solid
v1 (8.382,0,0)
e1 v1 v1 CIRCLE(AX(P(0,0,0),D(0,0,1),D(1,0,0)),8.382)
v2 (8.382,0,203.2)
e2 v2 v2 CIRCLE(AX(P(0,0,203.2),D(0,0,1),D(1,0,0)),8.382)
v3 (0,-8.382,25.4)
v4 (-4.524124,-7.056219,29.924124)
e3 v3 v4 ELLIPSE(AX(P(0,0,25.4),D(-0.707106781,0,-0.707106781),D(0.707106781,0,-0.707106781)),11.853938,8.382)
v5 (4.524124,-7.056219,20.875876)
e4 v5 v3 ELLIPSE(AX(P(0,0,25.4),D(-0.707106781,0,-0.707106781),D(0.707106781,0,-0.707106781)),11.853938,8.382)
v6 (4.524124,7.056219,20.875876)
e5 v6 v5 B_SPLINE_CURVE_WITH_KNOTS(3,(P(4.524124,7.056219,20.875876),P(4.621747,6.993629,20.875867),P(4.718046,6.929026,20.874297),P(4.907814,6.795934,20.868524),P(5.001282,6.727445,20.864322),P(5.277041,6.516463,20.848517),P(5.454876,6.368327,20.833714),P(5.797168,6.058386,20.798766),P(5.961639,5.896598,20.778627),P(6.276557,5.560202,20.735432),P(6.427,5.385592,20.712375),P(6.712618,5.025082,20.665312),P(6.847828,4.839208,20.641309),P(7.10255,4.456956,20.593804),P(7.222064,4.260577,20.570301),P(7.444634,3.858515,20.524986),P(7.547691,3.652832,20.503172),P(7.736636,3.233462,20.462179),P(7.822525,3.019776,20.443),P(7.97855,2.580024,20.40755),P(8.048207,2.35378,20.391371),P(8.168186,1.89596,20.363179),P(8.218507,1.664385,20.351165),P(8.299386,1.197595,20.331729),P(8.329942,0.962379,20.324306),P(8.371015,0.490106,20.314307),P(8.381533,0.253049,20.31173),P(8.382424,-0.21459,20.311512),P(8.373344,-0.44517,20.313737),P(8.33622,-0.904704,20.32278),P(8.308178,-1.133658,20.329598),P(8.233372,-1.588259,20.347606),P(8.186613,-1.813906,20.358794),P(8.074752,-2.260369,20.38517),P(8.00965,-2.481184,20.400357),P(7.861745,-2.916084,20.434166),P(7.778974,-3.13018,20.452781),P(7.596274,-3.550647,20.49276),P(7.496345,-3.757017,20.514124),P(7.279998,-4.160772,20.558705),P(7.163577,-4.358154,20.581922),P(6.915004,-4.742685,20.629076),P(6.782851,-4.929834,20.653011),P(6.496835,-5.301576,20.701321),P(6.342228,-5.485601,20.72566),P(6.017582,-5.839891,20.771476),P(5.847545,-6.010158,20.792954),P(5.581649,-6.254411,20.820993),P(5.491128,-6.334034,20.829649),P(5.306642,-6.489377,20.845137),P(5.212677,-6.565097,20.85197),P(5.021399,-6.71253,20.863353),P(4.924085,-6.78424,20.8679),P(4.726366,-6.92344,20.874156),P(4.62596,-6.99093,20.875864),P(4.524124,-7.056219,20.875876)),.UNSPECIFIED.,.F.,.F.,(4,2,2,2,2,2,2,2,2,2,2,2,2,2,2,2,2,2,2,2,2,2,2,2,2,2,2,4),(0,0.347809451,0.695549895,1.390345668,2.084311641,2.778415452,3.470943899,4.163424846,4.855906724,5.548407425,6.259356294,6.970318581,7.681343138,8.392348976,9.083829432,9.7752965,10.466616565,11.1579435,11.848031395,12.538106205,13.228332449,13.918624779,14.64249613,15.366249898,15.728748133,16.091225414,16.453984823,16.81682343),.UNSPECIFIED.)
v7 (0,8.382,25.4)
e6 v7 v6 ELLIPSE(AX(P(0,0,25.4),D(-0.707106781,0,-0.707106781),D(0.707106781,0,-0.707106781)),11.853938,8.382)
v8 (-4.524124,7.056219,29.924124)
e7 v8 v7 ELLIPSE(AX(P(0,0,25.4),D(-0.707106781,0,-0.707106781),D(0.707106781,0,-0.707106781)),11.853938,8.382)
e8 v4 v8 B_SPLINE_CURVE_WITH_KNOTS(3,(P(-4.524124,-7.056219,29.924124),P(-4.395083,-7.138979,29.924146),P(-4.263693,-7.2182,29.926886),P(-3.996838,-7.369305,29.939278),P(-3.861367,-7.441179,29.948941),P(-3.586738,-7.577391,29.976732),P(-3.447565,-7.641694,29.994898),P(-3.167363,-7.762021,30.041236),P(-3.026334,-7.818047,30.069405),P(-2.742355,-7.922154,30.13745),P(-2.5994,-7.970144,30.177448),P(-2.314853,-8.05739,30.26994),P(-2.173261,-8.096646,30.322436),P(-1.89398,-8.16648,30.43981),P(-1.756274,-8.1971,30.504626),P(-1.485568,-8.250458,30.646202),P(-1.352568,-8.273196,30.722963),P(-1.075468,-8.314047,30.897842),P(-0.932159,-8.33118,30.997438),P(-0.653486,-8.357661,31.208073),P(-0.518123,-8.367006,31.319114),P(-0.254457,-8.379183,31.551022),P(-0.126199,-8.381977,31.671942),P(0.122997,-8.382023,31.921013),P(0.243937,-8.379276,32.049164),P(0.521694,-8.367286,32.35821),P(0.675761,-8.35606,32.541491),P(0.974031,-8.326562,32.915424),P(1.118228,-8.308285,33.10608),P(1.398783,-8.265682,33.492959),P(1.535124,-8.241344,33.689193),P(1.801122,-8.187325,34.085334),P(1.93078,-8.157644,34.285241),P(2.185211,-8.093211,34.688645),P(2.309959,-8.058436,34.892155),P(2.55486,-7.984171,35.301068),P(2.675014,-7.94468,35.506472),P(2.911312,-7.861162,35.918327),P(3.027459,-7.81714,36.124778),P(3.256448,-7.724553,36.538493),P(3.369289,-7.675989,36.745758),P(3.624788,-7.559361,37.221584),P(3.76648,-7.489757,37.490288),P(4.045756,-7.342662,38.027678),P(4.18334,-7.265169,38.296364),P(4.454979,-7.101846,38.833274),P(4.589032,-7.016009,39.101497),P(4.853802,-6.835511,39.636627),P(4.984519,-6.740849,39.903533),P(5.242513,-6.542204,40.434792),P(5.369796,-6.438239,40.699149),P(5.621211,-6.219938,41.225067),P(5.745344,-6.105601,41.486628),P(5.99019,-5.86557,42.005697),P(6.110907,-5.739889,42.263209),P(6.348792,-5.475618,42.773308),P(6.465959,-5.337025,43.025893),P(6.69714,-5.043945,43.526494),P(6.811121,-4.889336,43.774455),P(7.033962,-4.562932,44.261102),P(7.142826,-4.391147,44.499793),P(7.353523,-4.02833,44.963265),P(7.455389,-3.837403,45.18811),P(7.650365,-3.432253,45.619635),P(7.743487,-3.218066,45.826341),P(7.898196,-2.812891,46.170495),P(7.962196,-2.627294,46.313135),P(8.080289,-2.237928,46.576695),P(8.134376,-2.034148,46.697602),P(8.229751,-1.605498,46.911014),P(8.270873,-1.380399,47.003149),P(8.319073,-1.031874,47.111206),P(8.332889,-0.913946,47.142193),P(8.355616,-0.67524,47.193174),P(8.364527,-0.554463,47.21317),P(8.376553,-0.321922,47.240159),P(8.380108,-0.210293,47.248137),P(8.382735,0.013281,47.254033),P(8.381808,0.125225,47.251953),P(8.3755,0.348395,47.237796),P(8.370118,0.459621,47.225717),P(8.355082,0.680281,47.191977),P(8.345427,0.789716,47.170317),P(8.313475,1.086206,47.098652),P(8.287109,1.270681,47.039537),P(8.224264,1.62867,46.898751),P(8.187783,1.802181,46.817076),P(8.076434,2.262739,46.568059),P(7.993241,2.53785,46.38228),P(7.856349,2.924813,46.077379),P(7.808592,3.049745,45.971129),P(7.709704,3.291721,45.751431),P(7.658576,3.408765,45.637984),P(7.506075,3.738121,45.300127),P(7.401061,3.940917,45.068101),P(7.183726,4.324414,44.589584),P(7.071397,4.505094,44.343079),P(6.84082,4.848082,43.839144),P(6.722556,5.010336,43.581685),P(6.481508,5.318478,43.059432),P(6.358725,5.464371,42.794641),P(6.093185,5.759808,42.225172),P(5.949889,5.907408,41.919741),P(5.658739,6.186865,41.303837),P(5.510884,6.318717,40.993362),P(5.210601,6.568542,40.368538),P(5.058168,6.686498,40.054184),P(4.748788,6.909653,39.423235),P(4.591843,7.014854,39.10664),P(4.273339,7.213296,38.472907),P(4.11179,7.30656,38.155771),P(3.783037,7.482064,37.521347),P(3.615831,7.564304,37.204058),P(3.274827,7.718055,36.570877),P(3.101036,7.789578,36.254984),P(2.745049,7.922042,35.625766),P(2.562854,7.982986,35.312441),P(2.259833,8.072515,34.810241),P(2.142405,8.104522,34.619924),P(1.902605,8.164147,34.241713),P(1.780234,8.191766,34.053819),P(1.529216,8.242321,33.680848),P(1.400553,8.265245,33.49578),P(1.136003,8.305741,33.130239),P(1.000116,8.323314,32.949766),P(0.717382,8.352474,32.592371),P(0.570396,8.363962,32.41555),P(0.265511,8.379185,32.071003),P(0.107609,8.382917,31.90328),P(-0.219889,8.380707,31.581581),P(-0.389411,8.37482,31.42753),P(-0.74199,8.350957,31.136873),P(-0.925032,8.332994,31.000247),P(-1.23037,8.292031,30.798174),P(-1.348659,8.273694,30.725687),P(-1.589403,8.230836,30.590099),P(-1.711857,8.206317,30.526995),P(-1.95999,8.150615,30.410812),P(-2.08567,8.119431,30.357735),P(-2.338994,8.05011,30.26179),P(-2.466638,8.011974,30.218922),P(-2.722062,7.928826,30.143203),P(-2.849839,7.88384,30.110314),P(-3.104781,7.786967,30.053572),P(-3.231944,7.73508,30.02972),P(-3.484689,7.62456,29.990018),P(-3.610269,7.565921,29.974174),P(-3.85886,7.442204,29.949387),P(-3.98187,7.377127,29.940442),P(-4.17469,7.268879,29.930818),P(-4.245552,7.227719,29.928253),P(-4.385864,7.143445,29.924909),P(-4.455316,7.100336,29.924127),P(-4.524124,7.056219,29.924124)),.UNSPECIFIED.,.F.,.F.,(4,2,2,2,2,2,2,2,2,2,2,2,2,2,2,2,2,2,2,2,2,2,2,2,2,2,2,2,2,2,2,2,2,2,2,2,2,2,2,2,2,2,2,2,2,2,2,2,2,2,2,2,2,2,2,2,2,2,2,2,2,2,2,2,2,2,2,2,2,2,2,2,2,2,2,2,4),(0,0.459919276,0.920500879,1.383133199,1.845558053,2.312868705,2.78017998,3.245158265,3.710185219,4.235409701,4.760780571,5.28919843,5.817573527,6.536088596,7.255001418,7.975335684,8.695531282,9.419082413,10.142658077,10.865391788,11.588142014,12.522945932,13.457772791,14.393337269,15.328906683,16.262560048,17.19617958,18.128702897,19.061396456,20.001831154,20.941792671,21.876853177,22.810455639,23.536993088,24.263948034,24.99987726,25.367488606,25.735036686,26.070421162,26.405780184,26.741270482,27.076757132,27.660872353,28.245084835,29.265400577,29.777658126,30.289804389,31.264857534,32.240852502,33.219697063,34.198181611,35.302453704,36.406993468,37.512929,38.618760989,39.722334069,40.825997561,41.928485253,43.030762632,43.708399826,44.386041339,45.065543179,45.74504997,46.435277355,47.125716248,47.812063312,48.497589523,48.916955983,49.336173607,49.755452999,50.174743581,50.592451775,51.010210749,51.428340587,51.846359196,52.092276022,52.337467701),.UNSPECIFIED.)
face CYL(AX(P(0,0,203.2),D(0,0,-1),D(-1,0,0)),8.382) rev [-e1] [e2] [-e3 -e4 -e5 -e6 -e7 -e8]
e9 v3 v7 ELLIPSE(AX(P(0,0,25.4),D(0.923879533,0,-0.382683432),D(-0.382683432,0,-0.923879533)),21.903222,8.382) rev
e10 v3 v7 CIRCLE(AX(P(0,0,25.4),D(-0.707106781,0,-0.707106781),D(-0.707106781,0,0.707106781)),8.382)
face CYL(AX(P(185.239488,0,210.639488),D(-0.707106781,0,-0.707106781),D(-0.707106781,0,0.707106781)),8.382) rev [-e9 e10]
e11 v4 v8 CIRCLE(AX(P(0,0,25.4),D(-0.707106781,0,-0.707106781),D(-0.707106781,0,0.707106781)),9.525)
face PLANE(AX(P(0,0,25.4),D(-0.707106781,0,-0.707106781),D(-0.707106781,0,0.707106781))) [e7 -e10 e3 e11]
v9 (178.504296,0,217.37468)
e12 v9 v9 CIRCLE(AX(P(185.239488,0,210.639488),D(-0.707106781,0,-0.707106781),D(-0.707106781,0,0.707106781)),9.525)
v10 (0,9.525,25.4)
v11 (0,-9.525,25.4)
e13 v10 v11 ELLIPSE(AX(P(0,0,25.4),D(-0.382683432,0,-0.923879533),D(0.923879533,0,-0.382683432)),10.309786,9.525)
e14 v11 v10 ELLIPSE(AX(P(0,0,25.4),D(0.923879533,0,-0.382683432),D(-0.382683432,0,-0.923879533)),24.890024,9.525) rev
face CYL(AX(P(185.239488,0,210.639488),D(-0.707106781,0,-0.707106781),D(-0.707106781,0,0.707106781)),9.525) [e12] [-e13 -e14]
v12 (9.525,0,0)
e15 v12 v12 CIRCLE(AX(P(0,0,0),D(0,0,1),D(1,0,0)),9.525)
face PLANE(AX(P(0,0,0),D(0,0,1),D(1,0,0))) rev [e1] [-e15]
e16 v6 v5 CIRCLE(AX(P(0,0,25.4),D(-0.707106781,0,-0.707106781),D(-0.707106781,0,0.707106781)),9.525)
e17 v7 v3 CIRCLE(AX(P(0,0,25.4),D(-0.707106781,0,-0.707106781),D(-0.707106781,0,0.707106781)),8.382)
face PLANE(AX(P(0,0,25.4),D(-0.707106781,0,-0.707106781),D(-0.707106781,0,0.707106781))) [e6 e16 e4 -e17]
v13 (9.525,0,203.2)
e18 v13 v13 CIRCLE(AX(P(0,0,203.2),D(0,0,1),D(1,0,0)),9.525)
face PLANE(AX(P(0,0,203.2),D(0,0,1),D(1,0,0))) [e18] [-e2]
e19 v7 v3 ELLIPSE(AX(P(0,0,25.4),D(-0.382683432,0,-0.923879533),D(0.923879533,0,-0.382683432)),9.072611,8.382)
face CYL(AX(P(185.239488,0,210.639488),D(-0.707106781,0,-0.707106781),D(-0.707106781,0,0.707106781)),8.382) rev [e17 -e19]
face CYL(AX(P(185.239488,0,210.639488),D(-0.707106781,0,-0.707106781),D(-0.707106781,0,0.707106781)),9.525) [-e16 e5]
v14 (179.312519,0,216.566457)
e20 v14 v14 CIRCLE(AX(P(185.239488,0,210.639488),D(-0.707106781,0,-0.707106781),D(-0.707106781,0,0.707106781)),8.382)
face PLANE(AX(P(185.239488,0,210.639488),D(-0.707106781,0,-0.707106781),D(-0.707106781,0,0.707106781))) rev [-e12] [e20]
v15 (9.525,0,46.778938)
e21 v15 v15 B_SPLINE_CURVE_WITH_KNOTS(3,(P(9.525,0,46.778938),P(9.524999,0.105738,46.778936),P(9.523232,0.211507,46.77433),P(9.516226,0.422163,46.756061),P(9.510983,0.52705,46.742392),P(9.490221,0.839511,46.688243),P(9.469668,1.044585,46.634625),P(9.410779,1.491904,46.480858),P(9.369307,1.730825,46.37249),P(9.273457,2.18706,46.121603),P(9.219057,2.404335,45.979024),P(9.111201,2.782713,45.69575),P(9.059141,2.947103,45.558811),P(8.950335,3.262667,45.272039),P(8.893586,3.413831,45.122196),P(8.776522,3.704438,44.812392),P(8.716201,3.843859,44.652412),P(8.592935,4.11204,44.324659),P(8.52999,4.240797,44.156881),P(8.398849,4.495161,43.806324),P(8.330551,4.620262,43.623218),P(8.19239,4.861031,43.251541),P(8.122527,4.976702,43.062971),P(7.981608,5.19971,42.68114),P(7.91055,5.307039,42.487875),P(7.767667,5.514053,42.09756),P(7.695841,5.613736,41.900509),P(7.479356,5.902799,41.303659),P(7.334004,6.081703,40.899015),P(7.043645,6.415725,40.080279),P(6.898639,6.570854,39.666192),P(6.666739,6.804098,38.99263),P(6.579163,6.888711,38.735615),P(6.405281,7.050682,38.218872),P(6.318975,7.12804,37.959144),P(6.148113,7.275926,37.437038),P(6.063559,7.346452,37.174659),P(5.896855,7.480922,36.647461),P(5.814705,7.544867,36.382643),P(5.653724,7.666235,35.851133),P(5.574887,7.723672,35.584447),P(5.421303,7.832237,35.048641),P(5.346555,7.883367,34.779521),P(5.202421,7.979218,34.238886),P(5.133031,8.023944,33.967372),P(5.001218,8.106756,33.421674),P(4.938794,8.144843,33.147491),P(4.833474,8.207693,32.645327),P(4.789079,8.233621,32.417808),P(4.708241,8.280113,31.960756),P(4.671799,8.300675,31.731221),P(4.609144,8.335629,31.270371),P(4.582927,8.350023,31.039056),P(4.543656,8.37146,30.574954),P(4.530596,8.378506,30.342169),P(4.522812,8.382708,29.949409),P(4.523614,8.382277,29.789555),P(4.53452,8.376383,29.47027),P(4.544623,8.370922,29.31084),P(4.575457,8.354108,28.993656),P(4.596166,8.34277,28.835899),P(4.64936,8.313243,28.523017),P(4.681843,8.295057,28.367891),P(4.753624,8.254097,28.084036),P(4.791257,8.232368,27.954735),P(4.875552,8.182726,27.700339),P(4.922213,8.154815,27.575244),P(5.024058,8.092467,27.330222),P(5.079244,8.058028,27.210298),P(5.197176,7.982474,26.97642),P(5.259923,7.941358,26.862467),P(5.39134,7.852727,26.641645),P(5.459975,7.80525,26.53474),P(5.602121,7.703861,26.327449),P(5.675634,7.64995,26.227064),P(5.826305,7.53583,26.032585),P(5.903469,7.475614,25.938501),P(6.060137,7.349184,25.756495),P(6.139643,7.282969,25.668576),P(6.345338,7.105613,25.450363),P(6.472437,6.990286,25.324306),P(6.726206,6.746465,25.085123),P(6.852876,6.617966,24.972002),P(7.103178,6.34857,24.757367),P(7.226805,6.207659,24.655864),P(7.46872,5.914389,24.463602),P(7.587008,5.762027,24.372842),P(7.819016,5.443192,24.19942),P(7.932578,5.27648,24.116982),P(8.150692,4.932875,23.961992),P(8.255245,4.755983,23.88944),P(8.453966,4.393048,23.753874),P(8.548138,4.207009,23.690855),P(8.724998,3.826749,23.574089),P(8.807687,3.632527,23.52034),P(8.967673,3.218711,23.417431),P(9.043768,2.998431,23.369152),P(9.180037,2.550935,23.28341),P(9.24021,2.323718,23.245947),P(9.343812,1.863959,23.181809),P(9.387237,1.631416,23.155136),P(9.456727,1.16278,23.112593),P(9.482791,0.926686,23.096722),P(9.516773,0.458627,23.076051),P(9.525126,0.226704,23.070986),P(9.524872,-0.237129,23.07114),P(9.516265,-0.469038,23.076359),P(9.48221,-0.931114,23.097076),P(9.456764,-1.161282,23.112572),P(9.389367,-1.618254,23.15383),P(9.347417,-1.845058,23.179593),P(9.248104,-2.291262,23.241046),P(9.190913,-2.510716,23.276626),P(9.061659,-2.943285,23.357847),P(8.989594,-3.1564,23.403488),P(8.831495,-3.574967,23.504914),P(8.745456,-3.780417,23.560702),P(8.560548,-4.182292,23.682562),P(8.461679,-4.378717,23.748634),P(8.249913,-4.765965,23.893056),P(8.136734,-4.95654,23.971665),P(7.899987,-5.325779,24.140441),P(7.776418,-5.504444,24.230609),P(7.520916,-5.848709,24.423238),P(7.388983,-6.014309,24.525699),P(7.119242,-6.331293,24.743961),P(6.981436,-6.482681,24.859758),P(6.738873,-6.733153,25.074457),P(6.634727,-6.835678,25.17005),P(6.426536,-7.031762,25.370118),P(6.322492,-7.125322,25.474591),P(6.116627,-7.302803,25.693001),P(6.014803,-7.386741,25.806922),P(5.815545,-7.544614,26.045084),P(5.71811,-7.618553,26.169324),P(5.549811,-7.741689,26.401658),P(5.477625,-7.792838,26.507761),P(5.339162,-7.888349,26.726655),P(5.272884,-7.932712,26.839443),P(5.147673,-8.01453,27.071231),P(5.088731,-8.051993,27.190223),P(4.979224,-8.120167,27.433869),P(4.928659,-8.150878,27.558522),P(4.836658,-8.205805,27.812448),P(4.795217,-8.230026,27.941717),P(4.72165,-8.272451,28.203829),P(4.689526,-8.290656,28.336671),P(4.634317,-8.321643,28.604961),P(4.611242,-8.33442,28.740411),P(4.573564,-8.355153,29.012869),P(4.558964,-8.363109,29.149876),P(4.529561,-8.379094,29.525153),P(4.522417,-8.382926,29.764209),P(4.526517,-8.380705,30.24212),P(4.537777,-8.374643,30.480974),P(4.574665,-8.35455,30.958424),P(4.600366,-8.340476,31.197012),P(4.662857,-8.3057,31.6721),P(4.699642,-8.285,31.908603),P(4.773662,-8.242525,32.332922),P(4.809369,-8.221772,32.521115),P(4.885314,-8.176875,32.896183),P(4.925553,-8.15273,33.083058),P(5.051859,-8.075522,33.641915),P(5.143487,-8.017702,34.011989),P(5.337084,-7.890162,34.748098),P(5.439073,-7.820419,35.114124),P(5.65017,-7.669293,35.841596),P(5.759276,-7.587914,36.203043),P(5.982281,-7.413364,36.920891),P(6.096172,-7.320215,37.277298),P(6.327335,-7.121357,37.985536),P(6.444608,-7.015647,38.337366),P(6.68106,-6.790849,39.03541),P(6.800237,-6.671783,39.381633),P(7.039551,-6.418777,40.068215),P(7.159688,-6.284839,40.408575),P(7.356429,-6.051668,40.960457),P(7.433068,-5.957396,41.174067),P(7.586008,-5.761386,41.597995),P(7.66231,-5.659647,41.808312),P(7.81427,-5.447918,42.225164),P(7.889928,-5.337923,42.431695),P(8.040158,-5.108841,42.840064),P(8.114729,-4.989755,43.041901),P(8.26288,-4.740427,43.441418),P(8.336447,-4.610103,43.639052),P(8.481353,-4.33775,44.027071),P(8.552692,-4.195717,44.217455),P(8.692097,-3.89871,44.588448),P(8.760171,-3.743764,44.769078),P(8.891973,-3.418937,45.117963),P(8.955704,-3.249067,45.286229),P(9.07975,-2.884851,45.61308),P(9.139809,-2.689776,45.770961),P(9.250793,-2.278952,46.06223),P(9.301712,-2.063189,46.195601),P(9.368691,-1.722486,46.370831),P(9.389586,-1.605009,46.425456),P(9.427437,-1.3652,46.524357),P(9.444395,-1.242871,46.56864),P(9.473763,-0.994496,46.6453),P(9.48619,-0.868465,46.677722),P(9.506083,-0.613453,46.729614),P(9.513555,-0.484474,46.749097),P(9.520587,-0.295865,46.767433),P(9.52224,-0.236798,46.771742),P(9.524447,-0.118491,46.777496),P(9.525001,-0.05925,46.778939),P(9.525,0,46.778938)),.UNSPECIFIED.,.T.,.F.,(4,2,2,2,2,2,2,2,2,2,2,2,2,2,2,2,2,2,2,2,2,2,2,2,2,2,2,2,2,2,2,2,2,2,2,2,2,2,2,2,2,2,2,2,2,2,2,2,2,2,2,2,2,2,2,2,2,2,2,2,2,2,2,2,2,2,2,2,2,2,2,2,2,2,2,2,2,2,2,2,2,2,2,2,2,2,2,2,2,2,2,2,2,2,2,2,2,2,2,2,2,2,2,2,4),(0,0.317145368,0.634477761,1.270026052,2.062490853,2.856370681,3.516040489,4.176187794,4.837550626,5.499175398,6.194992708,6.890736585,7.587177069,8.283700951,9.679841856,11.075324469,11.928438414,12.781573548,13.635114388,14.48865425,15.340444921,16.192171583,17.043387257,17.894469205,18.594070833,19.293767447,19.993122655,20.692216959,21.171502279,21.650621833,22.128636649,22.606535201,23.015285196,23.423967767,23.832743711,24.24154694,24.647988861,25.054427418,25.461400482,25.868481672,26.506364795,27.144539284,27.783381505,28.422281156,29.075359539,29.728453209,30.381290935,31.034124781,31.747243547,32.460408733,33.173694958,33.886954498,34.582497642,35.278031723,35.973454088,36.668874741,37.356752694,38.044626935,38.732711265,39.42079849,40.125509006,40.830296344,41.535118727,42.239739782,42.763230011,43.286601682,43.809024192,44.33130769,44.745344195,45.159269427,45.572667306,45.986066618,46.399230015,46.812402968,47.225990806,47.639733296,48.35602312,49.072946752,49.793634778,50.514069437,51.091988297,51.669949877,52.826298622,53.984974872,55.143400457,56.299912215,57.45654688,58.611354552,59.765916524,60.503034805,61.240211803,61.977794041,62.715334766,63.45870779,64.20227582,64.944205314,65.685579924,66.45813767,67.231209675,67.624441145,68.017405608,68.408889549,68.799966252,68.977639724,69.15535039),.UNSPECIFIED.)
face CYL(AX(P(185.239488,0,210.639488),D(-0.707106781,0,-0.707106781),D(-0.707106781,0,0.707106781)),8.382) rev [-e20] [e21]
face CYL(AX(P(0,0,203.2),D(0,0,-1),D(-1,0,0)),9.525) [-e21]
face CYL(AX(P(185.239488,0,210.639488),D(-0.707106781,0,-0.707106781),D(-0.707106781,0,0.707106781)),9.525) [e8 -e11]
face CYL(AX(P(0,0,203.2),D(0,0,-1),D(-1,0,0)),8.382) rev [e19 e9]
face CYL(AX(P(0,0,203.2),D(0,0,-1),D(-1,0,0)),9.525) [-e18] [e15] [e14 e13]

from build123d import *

# Parameters (mm, degrees)
SKETCH1_R             = 9.525
SKETCH1_R_2           = 8.382
BOSS_EXTRUDE2_DEPTH   = 203.2
SWEEP_THIN1_START     = 17.960512242
SWEEP_THIN1_OUTLINE_R = 8.382
SWEEP_THIN1_DEPTH     = 261.968195874


# Read off the part's stored shape, not the designer's step: Sweep-Thin1
with BuildPart() as part:
    # Sketch1 → Boss-Extrude2 (new body)
    with BuildSketch(Plane.XY):
        with Locations(Location((0, 0, 0), (0, 0, 180))):
            Circle(SKETCH1_R)
        with Locations(Location((0, 0, 0), (0, 0, 180))):
            Circle(SKETCH1_R_2, mode=Mode.SUBTRACT)
    extrude(amount=BOSS_EXTRUDE2_DEPTH)

    # Sweep-Thin1 outline → Sweep-Thin1 (add)
    with BuildSketch(Plane(origin=(0, 0, 0), x_dir=(0.7071067811865474, 0, -0.7071067811865477), z_dir=(0.7071067811865476, 0, 0.7071067811865476)).offset(SWEEP_THIN1_START)):
        with BuildLine():
            ThreePointArc((-22.484132156, 8.382272238), (-27.48551224, 0.000176979), (-22.484443646, -8.382104131))
            ThreePointArc((-22.484443646, -8.382104131), (-16.812644927, -9.455581718), (-11.562434249, -7.056218747))
            ThreePointArc((-11.562434249, -7.056218747), (-8.435512242, 0), (-11.562434249, 7.056218747))
            ThreePointArc((-11.562434249, 7.056218747), (-16.812469239, 9.455560389), (-22.484132156, 8.382272238))
        make_face()
        with Locations((-17.960512242, 0)):
            Circle(SWEEP_THIN1_OUTLINE_R, mode=Mode.SUBTRACT)
    extrude(amount=SWEEP_THIN1_DEPTH)


solid = part.part
